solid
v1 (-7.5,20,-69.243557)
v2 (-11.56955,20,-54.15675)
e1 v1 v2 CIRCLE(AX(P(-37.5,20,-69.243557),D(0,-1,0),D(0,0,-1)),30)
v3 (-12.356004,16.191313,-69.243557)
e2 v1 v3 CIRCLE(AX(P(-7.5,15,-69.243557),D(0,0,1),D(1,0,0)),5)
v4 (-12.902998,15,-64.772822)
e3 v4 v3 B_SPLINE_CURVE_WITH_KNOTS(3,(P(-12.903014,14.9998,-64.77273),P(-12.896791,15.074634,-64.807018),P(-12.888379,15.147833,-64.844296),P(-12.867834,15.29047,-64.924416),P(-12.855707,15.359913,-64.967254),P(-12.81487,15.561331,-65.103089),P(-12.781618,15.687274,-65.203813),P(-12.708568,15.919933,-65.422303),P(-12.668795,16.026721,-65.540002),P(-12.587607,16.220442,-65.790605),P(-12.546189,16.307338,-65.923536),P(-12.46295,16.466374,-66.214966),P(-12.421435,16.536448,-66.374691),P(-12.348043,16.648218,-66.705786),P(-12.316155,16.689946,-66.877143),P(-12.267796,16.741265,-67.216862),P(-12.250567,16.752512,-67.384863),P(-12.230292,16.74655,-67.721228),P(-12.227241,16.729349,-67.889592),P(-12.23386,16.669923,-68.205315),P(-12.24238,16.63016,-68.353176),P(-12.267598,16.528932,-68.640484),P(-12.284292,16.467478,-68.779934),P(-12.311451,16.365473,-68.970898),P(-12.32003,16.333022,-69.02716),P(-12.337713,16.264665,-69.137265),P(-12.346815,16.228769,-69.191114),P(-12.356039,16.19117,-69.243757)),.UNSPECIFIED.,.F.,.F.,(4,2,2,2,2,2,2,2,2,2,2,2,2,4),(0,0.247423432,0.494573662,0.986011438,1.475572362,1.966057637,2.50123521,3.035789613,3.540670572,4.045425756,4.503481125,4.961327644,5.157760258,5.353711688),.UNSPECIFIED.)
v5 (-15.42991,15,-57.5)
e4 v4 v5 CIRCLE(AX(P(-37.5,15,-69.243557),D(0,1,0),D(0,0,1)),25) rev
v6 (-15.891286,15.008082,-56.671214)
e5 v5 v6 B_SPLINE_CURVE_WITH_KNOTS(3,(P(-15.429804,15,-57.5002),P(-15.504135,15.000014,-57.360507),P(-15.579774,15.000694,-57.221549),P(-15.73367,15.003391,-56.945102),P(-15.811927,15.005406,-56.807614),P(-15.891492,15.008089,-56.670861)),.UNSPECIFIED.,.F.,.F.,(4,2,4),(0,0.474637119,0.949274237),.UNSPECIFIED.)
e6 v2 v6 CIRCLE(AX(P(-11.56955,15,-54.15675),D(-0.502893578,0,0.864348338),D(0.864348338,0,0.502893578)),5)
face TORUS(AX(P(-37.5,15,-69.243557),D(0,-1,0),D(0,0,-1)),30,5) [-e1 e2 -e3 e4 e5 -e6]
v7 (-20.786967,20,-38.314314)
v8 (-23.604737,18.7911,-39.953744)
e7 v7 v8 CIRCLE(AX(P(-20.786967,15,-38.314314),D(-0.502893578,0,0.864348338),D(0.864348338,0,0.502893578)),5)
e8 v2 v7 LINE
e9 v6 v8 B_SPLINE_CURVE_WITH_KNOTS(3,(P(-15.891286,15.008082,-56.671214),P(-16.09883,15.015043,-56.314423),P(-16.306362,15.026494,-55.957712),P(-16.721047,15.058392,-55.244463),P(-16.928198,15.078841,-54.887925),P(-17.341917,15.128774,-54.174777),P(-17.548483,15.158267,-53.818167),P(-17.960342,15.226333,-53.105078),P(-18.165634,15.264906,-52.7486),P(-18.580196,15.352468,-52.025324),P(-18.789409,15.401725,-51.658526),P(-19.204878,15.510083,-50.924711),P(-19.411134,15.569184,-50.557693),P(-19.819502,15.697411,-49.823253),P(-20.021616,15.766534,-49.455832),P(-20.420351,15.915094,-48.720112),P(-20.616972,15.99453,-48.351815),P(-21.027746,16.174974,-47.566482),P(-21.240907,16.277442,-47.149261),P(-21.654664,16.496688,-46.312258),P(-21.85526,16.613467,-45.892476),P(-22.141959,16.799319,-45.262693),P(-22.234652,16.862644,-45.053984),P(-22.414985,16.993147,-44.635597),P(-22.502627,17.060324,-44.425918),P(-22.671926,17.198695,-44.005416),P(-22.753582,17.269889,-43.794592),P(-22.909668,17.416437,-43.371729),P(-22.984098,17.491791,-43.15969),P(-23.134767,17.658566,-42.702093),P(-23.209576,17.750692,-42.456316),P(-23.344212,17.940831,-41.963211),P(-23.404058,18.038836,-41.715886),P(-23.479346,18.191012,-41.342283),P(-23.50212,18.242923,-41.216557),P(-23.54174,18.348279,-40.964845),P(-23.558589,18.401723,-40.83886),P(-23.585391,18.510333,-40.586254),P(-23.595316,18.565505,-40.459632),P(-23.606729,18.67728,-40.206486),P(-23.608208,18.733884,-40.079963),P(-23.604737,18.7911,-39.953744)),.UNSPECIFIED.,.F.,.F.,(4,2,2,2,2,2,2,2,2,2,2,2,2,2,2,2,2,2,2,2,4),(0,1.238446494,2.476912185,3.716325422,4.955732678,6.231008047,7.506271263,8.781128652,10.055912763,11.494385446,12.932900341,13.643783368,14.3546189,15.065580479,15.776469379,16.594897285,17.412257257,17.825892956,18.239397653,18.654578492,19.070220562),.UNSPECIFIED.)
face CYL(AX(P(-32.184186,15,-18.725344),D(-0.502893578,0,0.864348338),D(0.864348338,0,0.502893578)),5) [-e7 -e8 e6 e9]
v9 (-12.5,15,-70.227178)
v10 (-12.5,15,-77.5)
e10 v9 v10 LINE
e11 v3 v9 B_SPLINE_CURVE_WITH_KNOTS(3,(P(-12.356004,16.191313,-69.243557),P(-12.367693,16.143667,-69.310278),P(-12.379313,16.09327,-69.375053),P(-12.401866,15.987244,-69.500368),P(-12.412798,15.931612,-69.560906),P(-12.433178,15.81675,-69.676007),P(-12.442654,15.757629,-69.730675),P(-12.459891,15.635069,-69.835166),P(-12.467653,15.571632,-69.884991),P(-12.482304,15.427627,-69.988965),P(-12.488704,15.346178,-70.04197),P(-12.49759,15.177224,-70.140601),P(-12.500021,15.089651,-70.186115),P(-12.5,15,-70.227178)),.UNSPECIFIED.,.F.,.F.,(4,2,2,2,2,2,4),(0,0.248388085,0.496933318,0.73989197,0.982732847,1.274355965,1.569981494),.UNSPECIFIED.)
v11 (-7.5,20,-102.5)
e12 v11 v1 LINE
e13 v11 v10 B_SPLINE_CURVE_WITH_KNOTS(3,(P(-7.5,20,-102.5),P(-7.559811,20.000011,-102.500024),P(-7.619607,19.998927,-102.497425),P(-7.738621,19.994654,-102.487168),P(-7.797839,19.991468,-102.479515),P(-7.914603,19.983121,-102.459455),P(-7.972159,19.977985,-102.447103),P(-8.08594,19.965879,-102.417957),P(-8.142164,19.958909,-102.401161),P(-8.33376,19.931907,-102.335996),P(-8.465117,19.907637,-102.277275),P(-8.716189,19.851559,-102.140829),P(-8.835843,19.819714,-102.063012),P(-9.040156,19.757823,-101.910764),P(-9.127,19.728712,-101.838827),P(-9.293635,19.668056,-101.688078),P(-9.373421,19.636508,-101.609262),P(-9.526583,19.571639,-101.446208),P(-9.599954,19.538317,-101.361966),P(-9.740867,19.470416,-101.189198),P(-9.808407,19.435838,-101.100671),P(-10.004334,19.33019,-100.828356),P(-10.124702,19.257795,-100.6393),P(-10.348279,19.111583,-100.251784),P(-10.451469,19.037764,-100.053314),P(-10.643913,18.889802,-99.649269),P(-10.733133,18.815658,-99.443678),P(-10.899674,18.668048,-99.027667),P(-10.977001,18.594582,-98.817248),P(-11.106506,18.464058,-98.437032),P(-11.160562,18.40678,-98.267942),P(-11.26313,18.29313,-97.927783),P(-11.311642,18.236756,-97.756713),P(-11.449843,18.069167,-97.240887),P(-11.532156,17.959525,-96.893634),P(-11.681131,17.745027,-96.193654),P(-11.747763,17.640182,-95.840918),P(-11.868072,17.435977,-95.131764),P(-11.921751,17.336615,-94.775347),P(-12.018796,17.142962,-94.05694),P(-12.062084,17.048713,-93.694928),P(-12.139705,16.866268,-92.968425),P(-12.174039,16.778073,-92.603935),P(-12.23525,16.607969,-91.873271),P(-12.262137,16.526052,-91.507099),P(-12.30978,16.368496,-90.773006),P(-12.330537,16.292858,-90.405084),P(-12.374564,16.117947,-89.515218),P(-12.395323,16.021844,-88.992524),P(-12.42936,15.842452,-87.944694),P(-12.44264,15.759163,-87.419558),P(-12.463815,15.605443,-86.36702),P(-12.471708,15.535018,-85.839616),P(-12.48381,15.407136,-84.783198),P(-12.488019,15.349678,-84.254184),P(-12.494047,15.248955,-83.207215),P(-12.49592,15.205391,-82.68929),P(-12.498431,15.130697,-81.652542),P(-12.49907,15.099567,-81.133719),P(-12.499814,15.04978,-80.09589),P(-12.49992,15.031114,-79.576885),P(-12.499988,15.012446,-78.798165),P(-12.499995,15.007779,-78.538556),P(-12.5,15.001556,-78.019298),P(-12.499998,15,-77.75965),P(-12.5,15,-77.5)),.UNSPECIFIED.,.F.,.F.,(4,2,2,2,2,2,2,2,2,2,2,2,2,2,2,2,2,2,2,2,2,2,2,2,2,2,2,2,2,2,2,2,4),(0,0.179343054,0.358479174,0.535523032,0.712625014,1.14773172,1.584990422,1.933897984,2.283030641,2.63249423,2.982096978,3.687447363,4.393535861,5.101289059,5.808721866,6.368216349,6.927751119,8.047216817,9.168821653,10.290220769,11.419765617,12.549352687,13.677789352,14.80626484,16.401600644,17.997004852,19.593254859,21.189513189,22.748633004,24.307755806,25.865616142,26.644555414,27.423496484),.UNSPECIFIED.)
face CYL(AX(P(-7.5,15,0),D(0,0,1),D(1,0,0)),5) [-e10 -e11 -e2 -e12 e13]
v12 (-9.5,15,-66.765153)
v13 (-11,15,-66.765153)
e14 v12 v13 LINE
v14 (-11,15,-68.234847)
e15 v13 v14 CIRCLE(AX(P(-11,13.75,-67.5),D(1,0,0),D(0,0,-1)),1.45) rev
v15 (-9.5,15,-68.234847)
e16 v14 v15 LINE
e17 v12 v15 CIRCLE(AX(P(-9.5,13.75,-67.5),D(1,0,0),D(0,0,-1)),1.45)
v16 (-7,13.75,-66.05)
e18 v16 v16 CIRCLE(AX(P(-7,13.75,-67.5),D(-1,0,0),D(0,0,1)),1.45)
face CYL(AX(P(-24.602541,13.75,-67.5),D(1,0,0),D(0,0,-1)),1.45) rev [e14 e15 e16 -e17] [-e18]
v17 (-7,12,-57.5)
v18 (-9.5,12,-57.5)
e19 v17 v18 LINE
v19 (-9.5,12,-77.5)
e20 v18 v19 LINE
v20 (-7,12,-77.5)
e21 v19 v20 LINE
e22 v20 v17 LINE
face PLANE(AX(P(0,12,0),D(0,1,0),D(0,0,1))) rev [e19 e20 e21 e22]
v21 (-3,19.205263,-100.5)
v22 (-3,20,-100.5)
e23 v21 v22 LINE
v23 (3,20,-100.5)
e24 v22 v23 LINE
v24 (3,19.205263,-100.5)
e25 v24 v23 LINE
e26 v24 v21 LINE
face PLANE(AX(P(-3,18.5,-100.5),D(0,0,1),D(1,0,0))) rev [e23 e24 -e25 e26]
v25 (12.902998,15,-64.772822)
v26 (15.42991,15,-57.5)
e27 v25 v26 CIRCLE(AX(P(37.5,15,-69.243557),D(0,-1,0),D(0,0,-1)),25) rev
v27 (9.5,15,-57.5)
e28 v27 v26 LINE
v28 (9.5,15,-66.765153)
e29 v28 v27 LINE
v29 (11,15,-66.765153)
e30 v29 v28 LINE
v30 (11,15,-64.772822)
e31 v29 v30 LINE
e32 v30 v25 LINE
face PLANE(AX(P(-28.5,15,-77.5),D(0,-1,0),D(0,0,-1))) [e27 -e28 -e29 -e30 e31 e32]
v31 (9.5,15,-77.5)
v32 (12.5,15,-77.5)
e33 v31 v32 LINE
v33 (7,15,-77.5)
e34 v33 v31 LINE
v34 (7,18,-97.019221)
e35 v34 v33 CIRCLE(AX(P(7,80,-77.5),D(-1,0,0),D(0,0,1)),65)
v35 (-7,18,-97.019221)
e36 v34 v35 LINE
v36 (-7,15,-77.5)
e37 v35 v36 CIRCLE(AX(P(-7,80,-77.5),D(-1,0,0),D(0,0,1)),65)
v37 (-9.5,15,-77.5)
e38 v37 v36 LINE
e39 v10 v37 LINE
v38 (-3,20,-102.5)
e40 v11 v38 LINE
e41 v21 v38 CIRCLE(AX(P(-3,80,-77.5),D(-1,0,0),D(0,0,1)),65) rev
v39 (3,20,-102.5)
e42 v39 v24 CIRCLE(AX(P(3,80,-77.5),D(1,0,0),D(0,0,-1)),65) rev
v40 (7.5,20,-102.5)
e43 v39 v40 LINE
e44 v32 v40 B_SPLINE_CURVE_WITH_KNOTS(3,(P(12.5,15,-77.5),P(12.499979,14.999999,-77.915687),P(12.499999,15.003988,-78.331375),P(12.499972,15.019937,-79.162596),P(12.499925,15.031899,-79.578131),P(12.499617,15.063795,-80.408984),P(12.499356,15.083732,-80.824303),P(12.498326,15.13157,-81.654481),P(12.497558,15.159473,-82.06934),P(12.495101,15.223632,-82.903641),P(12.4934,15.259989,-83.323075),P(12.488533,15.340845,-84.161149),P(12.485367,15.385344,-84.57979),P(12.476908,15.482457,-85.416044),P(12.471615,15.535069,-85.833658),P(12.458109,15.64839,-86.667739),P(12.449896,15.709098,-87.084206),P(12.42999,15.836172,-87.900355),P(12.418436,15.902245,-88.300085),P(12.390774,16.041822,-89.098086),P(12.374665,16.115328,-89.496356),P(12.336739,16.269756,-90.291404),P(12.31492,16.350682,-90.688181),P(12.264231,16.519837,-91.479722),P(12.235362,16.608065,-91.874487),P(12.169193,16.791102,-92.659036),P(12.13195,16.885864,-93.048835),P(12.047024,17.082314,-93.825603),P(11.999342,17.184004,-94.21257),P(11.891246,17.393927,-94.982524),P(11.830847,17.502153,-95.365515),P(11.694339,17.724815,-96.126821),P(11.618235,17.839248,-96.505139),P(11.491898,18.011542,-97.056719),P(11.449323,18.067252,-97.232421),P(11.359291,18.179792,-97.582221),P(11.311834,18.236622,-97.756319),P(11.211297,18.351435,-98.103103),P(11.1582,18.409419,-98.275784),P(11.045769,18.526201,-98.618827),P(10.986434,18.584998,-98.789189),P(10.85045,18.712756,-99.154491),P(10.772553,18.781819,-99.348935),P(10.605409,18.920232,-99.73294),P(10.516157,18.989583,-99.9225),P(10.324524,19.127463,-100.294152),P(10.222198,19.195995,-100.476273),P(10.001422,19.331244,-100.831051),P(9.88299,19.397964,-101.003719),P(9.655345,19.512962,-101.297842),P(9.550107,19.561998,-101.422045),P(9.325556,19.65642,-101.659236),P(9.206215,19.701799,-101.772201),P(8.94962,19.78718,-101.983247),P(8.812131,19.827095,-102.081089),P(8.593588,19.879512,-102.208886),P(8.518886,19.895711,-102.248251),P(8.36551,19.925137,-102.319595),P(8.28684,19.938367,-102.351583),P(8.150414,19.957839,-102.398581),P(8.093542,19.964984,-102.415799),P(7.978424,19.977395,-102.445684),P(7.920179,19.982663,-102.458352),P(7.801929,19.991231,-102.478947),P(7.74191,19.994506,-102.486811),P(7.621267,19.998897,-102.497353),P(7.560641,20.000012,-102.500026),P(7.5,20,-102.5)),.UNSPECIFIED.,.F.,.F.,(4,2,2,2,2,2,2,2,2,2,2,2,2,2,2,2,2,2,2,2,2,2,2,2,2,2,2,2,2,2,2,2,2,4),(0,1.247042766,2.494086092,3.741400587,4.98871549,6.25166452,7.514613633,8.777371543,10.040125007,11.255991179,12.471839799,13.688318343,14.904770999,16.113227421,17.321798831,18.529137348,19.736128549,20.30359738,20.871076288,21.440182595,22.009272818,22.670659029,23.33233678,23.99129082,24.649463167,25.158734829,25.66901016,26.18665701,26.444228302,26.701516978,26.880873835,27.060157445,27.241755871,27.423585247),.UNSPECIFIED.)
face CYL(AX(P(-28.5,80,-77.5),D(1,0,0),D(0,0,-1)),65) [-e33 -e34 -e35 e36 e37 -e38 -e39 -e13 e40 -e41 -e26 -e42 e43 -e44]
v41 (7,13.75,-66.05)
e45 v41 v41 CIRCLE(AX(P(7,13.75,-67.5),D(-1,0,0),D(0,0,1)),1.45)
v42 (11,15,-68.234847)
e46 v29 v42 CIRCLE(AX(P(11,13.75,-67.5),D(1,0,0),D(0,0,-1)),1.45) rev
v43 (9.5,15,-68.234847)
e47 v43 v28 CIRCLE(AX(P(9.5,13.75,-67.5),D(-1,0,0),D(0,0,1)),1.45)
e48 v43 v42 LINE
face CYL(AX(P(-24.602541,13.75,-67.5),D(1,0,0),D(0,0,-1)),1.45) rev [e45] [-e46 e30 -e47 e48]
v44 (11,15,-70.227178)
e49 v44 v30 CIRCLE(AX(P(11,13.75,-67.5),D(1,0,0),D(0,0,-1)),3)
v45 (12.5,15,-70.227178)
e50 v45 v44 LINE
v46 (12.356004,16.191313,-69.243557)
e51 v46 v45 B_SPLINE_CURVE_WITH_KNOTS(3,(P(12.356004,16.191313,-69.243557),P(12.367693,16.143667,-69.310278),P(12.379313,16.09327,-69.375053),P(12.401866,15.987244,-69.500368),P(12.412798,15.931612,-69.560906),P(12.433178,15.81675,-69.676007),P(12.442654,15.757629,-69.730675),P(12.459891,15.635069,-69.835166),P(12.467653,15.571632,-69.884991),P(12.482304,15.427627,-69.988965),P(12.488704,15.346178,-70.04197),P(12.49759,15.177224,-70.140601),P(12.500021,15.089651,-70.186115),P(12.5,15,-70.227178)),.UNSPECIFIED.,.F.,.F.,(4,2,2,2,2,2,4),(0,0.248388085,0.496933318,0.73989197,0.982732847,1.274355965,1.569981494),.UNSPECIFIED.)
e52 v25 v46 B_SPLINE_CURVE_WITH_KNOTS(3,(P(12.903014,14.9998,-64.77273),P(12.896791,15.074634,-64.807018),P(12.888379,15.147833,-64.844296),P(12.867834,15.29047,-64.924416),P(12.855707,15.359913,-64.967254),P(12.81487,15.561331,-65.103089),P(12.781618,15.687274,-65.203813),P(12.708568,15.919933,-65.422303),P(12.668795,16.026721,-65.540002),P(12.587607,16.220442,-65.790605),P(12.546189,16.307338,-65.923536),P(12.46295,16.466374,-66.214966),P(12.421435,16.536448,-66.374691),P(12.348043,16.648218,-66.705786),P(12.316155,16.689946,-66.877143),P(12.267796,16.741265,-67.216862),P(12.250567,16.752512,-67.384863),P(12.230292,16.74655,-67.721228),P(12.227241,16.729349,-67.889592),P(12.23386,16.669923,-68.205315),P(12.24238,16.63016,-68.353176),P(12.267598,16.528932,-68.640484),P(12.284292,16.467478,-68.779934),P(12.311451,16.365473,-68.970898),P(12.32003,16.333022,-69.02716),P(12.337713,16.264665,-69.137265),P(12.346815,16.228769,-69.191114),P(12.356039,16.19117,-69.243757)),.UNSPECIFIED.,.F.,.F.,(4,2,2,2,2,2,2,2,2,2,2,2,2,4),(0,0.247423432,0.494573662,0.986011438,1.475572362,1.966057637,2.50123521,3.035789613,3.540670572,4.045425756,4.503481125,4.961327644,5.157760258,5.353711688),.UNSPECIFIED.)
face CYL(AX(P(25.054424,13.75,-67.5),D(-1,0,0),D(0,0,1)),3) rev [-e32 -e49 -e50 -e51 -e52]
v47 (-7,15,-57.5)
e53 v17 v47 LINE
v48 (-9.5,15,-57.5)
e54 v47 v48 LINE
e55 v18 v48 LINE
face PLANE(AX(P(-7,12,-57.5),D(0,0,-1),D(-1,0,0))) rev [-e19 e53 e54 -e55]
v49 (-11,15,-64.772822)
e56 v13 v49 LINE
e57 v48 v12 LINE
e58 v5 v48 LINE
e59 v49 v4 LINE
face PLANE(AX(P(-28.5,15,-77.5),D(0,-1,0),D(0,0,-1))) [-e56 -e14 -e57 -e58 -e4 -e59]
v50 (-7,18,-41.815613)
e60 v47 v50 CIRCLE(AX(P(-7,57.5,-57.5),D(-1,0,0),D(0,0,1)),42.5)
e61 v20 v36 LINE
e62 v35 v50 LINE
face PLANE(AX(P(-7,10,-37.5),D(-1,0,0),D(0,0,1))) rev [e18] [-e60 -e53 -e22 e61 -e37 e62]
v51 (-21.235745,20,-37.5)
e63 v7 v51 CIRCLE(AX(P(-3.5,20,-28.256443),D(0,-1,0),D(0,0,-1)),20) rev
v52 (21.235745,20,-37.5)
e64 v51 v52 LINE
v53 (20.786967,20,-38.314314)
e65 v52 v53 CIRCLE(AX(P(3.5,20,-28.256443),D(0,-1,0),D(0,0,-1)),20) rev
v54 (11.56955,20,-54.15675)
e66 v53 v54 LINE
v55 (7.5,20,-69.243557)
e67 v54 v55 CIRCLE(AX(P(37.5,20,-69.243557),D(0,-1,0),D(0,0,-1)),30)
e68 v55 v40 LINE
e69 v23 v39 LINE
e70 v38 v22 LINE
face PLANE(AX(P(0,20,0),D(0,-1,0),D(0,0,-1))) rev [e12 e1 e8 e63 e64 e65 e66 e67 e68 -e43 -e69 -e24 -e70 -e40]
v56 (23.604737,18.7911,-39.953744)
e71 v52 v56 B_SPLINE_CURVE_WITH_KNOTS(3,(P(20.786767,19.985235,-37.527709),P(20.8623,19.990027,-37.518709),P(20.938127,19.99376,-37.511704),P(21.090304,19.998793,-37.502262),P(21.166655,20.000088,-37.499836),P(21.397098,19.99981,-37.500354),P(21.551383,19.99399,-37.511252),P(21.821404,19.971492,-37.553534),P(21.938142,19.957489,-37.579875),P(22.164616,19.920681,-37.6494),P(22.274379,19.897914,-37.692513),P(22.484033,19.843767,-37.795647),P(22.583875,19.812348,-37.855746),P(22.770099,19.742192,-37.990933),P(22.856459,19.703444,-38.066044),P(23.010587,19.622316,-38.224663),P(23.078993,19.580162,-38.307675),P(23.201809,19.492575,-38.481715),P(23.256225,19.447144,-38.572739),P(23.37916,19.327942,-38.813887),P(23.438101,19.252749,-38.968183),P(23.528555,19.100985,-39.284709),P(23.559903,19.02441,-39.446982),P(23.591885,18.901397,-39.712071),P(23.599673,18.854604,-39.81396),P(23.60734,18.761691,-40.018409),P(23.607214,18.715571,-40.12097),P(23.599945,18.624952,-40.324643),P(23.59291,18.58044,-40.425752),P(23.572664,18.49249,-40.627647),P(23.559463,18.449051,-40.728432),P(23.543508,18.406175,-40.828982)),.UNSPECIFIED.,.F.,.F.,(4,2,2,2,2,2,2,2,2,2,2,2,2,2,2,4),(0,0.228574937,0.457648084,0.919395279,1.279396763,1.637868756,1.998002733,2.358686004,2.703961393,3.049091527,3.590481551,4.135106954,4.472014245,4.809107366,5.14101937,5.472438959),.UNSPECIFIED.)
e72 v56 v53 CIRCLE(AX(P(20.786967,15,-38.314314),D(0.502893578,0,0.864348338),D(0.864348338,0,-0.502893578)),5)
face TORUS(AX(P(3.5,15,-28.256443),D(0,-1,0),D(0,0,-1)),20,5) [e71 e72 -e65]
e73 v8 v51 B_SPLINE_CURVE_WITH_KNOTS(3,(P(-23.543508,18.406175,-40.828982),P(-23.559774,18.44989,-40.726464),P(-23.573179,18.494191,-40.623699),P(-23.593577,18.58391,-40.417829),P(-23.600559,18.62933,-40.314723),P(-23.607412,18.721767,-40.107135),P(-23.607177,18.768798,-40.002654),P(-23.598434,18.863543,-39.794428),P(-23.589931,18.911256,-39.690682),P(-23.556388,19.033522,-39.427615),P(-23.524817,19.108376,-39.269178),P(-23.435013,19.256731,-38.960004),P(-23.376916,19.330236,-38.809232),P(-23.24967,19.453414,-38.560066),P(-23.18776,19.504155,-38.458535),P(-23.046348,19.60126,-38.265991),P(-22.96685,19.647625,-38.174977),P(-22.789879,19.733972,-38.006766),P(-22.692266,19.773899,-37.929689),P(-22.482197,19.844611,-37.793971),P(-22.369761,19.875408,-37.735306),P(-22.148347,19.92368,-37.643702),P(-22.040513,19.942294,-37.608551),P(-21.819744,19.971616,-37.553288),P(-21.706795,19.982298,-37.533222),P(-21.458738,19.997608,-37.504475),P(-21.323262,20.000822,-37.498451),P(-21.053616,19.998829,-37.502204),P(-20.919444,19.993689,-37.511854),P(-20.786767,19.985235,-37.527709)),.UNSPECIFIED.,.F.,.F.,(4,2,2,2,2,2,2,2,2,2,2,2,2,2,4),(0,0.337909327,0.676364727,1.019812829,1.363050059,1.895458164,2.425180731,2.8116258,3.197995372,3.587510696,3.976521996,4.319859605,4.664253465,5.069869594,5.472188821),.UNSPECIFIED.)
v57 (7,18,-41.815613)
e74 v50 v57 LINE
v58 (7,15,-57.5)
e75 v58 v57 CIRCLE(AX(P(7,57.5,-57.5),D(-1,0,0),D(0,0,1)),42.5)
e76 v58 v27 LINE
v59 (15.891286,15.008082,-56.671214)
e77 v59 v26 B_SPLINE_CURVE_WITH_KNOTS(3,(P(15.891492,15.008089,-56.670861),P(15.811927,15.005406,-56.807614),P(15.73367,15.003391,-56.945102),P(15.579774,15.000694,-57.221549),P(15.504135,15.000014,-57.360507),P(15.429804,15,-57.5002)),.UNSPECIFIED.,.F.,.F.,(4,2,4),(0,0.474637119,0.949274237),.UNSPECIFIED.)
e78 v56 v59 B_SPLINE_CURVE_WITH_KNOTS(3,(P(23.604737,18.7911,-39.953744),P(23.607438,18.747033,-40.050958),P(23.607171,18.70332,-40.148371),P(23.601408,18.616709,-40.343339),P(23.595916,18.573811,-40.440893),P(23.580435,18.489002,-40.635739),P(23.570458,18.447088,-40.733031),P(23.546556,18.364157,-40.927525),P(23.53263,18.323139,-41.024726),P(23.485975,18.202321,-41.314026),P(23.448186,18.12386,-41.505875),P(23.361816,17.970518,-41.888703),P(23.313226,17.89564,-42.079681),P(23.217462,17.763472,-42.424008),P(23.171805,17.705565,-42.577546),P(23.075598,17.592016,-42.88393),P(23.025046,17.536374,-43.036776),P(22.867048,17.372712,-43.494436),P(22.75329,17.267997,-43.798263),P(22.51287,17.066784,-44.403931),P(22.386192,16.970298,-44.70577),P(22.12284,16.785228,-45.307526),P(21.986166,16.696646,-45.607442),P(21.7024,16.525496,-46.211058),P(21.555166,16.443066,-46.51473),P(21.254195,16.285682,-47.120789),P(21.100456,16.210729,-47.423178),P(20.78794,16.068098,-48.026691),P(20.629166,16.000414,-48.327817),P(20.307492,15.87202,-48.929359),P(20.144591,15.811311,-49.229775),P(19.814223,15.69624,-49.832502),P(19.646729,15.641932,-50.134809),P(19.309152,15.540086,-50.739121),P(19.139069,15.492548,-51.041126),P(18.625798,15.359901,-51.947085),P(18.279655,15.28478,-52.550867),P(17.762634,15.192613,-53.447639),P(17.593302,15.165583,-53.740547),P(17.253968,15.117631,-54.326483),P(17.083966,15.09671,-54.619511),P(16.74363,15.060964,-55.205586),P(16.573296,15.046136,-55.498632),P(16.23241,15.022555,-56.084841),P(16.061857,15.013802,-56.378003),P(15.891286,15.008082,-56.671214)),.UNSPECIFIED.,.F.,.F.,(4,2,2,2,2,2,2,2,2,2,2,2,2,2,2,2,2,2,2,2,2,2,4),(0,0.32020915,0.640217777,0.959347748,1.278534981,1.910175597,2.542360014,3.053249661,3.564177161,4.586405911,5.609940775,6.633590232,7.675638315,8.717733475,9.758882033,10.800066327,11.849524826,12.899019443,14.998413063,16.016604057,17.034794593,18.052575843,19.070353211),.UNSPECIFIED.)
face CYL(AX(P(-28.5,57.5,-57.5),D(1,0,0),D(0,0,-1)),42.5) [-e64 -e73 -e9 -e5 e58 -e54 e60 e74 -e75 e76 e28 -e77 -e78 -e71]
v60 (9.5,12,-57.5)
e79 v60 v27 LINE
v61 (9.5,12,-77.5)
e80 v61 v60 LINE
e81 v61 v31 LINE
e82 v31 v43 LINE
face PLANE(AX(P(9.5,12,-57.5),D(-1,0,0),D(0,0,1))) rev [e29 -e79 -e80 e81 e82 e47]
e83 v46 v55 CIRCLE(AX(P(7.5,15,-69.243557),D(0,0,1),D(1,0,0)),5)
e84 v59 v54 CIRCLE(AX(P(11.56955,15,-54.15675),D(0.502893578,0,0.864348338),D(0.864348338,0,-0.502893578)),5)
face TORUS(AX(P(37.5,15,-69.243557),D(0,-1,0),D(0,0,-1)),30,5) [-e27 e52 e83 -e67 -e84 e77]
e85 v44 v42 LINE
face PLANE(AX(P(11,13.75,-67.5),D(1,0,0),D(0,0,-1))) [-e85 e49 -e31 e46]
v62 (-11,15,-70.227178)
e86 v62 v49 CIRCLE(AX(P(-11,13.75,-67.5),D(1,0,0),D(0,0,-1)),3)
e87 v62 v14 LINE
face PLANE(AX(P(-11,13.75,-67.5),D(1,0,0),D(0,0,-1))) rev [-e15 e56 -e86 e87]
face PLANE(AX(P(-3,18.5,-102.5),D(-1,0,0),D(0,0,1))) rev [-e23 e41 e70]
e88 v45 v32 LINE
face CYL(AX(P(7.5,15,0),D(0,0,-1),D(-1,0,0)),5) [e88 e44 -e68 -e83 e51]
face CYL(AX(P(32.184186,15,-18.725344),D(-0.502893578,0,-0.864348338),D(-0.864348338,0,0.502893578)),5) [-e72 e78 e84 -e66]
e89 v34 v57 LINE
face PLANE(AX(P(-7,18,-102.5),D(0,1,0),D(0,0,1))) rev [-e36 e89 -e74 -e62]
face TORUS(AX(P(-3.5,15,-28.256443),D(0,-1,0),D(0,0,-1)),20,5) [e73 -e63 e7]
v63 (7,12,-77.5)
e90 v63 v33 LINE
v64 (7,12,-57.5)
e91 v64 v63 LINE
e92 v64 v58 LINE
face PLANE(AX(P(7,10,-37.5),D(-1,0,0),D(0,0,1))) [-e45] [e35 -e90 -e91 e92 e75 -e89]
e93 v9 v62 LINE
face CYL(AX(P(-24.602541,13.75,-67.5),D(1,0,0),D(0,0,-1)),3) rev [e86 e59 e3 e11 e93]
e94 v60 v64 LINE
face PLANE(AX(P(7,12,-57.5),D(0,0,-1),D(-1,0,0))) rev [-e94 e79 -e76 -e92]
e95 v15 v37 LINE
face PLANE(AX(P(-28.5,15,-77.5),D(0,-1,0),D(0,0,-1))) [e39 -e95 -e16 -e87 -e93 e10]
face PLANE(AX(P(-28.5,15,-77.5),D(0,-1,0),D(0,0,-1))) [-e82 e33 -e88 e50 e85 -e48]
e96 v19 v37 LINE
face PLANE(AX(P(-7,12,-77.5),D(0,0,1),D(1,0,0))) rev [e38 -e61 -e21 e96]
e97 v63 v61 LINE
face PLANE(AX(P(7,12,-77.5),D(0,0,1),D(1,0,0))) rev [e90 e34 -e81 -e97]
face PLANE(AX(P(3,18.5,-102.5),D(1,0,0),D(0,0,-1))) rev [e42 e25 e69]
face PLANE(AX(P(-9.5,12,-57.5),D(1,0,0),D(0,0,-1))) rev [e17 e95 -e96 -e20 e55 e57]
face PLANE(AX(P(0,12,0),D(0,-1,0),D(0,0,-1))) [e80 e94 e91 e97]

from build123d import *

# Parameters (mm, degrees)
EXTRUDE_1_DEPTH           = 20
SKETCH_2_R                = 4
CUT_EXTRUDE_1_DEPTH       = 52
FILLET_1_R                = 25
FILLET_2_R                = 5
FILLET_3_R                = 10
SKETCH_4_W                = 8
SKETCH_4_H                = 8
CUT_EXTRUDE_2_DEPTH       = 5
CUT_EXTRUDE_START         = -57
SKETCH_4_2_W              = 8
SKETCH_4_2_H              = 8
CUT_EXTRUDE_3_DEPTH       = 5
SKETCH_5_W                = 15
SKETCH_5_H                = 5
CUT_EXTRUDE_4_DEPTH       = 7.5
SKETCH_6_R                = 1.45
CUT_EXTRUDE_5_DEPTH       = 10
CUT_EXTRUDE_6_DEPTH       = 7
SKETCH_9_R                = 1.45
CUT_EXTRUDE_7_DEPTH       = 90
CUT_EXTRUDE_8_DEPTH       = 116.378724321
CUT_EXTRUDE_8_DEPTH_BACK  = 116.378724321
SKETCH_10_W               = 136.912738892
SKETCH_10_H               = 37.062753894
SKETCH_11_W               = 2.5
SKETCH_11_H               = 20
EXTRUDE_2_DEPTH           = 3
CUT_EXTRUDE_9_DEPTH       = 110.555003156
CUT_EXTRUDE_9_DEPTH_BACK  = 110.555003156
SKETCH_12_R               = 1.45
CUT_EXTRUDE_10_DEPTH      = 110.555003156
CUT_EXTRUDE_10_DEPTH_BACK = 1.5
CUT_EXTRUDE_10_START      = 3
SKETCH_13_R               = 3
CUT_EXTRUDE_11_DEPTH      = 1.5
CUT_EXTRUDE_11_DEPTH_BACK = 110.555003156
CUT_EXTRUDE_11_START      = -22
SKETCH_13_2_R             = 3
SKETCH_14_W               = 6
SKETCH_14_H               = 2
CUT_EXTRUDE_12_DEPTH      = 1.5


with BuildPart() as part:
    # Эскиз1 → Бобышка-Вытянуть1 (new body)
    with BuildSketch(Plane(origin=(0, 0, 0), x_dir=(1, 0, 0), z_dir=(0, 1, 0))):
        Polygon((21, 25), (-21, 25), (-21, 0), (-28.5, 0), (-28.5, 35), (-12.5, 62.5), (-12.5, 110), (12.5, 110), (12.5, 62.5), (28.5, 35), (28.5, 0), (21, 0), align=None)
    extrude(amount=EXTRUDE_1_DEPTH)

    # Эскиз2 → Вырез-Вытянуть1 (cut)
    with BuildSketch(Plane(origin=(28.5, 0, 0), x_dir=(0, 0, -1), z_dir=(1, 0, 0))):
        with Locations((10, 10)):
            Circle(SKETCH_2_R)
    extrude(amount=-CUT_EXTRUDE_1_DEPTH, mode=Mode.SUBTRACT)

    # Скругление1
    fillet_1_edges = [part.edges().sort_by_distance(p)[0] for p in [
        (28.5, 10, -35),
        (-28.5, 10, -35),
        (-12.5, 10, -62.5),
        (12.5, 10, -62.5),
    ]]
    fillet(fillet_1_edges, radius=FILLET_1_R)

    # Скругление2
    fillet_2_edges = [part.edges().sort_by_distance(p)[0] for p in [
        (28.5, 0, -14.128221453),
        (24.75, 0, 0),
        (-24.75, 0, 0),
        (-12.5, 0, -89.621778547),
        (-12.5, 20, -89.621778547),
        (28.5, 10, 0),
        (-28.5, 10, 0),
        (-24.75, 20, 0),
        (24.75, 20, 0),
        (-28.5, 0, -14.128221453),
        (-28.5, 20, -14.128221453),
        (20.5, 0, -48.75),
        (-20.5, 0, -48.75),
        (12.5, 0, -89.621778547),
        (27.637291802, 0, -34.76729112),
        (-27.637291802, 0, -34.76729112),
        (28.5, 20, -14.128221453),
        (-20.5, 20, -48.75),
        (20.5, 20, -48.75),
        (12.5, 20, -89.621778547),
        (27.637291802, 20, -34.76729112),
        (-27.637291802, 20, -34.76729112),
        (-13.362708198, 0, -62.73270888),
        (-13.362708198, 20, -62.73270888),
        (13.362708198, 0, -62.73270888),
        (13.362708198, 20, -62.73270888),
    ]]
    fillet(fillet_2_edges, radius=FILLET_2_R)

    # Скругление3
    fillet_3_edges = [part.edges().sort_by_distance(p)[0] for p in [
        (0, 0, -25),
        (0, 20, -25),
    ]]
    fillet(fillet_3_edges, radius=FILLET_3_R - 0.0001)  # a hair under: the kernel refuses the full size

    # Эскиз4 → Вырез-Вытянуть2 (cut)
    with BuildSketch(Plane(origin=(28.5, 0, 0), x_dir=(0, 0, -1), z_dir=(1, 0, 0))):
        with Locations((10, 10)):
            Rectangle(SKETCH_4_W, SKETCH_4_H)
    extrude(amount=-CUT_EXTRUDE_2_DEPTH, mode=Mode.SUBTRACT)

    # Эскиз4<2> → Вырез-Вытянуть3 (cut)
    with BuildSketch(Plane(origin=(28.5, 0, 0), x_dir=(0, 0, -1), z_dir=(1, 0, 0)).offset(CUT_EXTRUDE_START)):
        with Locations((10, 10)):
            Rectangle(SKETCH_4_2_W, SKETCH_4_2_H)
    extrude(amount=CUT_EXTRUDE_3_DEPTH, mode=Mode.SUBTRACT)

    # Эскиз5 → Вырез-Вытянуть4 (cut)
    with BuildSketch(Plane(origin=(0, 0, -110), x_dir=(-1, 0, 0), z_dir=(0, 0, -1))):
        with Locations((0, 17.5)):
            Rectangle(SKETCH_5_W, SKETCH_5_H)
        with Locations((0, 2.5)):
            Rectangle(SKETCH_5_W, SKETCH_5_H)
    extrude(amount=-CUT_EXTRUDE_4_DEPTH, mode=Mode.SUBTRACT)

    # Эскиз6 → Вырез-Вытянуть5 (cut)
    with BuildSketch(Plane(origin=(0, 15, 0), x_dir=(1, 0, 0), z_dir=(0, 1, 0))):
        with Locations(Location((-4, 106.25, 0), (0, 0, 270))):
            Circle(SKETCH_6_R)
        with Locations(Location((4, 106.25, 0), (0, 0, 90))):
            Circle(SKETCH_6_R)
    extrude(amount=-CUT_EXTRUDE_5_DEPTH, mode=Mode.SUBTRACT)

    # Эскиз8 → Вырез-Вытянуть6 (cut, symmetric)
    with BuildSketch(Plane(origin=(0, 0, 0), x_dir=(0, 0, -1), z_dir=(1, 0, 0))):
        with BuildLine():
            Line((102.5, 18), (37.5, 18))
            ThreePointArc((37.5, 18), (29.5, 10), (37.5, 2))
            Line((37.5, 2), (102.5, 2))
            Line((102.5, 2), (102.5, 18))
        make_face()
    extrude(amount=CUT_EXTRUDE_6_DEPTH, both=True, mode=Mode.SUBTRACT)

    # Эскиз9 → Вырез-Вытянуть7 (cut)
    with BuildSketch(Plane(origin=(0, 0, -110), x_dir=(-1, 0, 0), z_dir=(0, 0, -1))):
        with Locations((-10, 10)):
            Circle(SKETCH_9_R)
        with Locations((10, 10)):
            Circle(SKETCH_9_R)
    extrude(amount=-CUT_EXTRUDE_7_DEPTH, mode=Mode.SUBTRACT)

    # Эскиз10 → Вырез-Вытянуть8 (cut, two sides: drawn at the far end of the back side and taken through both)
    with BuildSketch(Plane(origin=(0, 0, 0), x_dir=(0, 0, -1), z_dir=(1, 0, 0)).offset(-CUT_EXTRUDE_8_DEPTH_BACK)):
        with Locations((61.52396192, 11.158211059)):
            Rectangle(SKETCH_10_W, SKETCH_10_H)
        with BuildLine():
            Line((37.5, 20), (102.5, 20))
            ThreePointArc((102.5, 20), (90.247548784, 16.26225608), (77.5, 15))
            Line((77.5, 15), (57.5, 15))
            ThreePointArc((57.5, 15), (47.192235936, 16.268943744), (37.5, 20))
        make_face(mode=Mode.SUBTRACT)
    extrude(amount=CUT_EXTRUDE_8_DEPTH + CUT_EXTRUDE_8_DEPTH_BACK, mode=Mode.SUBTRACT)

    # Эскиз11 → Бобышка-Вытянуть2 (add)
    with BuildSketch(Plane.XZ.offset(-15)):
        with Locations((8.25, -67.5)):
            Rectangle(SKETCH_11_W, SKETCH_11_H)
        with Locations((-8.25, -67.5)):
            Rectangle(SKETCH_11_W, SKETCH_11_H)
    extrude(amount=EXTRUDE_2_DEPTH)

    # Эскиз12 → Вырез-Вытянуть9 (cut, two sides: drawn at the far end of the back side and taken through both)
    with BuildSketch(Plane(origin=(9.5, 0, 0), x_dir=(0, 0, -1), z_dir=(1, 0, 0)).offset(-CUT_EXTRUDE_9_DEPTH_BACK)):
        with Locations(Location((67.5, 13.75, 0), (0, 0, 59.549685979))):
            Circle(SKETCH_12_R)
    extrude(amount=CUT_EXTRUDE_9_DEPTH + CUT_EXTRUDE_9_DEPTH_BACK, mode=Mode.SUBTRACT)

    # Эскиз13 → Вырез-Вытянуть10 (cut, two sides: drawn at the far end of the back side and taken through both)
    with BuildSketch(Plane(origin=(9.5, 0, 0), x_dir=(0, 0, -1), z_dir=(1, 0, 0)).offset(CUT_EXTRUDE_10_START - CUT_EXTRUDE_10_DEPTH_BACK)):
        with Locations((67.5, 13.75)):
            Circle(SKETCH_13_R)
    extrude(amount=CUT_EXTRUDE_10_DEPTH + CUT_EXTRUDE_10_DEPTH_BACK, mode=Mode.SUBTRACT)

    # Эскиз13<2> → Вырез-Вытянуть11 (cut, two sides: drawn at the far end of the back side and taken through both)
    with BuildSketch(Plane(origin=(9.5, 0, 0), x_dir=(0, 0, -1), z_dir=(1, 0, 0)).offset(CUT_EXTRUDE_11_START - CUT_EXTRUDE_11_DEPTH_BACK)):
        with Locations((67.5, 13.75)):
            Circle(SKETCH_13_2_R)
    extrude(amount=CUT_EXTRUDE_11_DEPTH + CUT_EXTRUDE_11_DEPTH_BACK, mode=Mode.SUBTRACT)

    # Эскиз14 → Вырез-Вытянуть12 (cut)
    with BuildSketch(Plane(origin=(0, 20, 0), x_dir=(1, 0, 0), z_dir=(0, 1, 0))):
        with Locations((0, 101.5)):
            Rectangle(SKETCH_14_W, SKETCH_14_H)
    extrude(amount=-CUT_EXTRUDE_12_DEPTH, mode=Mode.SUBTRACT)


solid = part.part
